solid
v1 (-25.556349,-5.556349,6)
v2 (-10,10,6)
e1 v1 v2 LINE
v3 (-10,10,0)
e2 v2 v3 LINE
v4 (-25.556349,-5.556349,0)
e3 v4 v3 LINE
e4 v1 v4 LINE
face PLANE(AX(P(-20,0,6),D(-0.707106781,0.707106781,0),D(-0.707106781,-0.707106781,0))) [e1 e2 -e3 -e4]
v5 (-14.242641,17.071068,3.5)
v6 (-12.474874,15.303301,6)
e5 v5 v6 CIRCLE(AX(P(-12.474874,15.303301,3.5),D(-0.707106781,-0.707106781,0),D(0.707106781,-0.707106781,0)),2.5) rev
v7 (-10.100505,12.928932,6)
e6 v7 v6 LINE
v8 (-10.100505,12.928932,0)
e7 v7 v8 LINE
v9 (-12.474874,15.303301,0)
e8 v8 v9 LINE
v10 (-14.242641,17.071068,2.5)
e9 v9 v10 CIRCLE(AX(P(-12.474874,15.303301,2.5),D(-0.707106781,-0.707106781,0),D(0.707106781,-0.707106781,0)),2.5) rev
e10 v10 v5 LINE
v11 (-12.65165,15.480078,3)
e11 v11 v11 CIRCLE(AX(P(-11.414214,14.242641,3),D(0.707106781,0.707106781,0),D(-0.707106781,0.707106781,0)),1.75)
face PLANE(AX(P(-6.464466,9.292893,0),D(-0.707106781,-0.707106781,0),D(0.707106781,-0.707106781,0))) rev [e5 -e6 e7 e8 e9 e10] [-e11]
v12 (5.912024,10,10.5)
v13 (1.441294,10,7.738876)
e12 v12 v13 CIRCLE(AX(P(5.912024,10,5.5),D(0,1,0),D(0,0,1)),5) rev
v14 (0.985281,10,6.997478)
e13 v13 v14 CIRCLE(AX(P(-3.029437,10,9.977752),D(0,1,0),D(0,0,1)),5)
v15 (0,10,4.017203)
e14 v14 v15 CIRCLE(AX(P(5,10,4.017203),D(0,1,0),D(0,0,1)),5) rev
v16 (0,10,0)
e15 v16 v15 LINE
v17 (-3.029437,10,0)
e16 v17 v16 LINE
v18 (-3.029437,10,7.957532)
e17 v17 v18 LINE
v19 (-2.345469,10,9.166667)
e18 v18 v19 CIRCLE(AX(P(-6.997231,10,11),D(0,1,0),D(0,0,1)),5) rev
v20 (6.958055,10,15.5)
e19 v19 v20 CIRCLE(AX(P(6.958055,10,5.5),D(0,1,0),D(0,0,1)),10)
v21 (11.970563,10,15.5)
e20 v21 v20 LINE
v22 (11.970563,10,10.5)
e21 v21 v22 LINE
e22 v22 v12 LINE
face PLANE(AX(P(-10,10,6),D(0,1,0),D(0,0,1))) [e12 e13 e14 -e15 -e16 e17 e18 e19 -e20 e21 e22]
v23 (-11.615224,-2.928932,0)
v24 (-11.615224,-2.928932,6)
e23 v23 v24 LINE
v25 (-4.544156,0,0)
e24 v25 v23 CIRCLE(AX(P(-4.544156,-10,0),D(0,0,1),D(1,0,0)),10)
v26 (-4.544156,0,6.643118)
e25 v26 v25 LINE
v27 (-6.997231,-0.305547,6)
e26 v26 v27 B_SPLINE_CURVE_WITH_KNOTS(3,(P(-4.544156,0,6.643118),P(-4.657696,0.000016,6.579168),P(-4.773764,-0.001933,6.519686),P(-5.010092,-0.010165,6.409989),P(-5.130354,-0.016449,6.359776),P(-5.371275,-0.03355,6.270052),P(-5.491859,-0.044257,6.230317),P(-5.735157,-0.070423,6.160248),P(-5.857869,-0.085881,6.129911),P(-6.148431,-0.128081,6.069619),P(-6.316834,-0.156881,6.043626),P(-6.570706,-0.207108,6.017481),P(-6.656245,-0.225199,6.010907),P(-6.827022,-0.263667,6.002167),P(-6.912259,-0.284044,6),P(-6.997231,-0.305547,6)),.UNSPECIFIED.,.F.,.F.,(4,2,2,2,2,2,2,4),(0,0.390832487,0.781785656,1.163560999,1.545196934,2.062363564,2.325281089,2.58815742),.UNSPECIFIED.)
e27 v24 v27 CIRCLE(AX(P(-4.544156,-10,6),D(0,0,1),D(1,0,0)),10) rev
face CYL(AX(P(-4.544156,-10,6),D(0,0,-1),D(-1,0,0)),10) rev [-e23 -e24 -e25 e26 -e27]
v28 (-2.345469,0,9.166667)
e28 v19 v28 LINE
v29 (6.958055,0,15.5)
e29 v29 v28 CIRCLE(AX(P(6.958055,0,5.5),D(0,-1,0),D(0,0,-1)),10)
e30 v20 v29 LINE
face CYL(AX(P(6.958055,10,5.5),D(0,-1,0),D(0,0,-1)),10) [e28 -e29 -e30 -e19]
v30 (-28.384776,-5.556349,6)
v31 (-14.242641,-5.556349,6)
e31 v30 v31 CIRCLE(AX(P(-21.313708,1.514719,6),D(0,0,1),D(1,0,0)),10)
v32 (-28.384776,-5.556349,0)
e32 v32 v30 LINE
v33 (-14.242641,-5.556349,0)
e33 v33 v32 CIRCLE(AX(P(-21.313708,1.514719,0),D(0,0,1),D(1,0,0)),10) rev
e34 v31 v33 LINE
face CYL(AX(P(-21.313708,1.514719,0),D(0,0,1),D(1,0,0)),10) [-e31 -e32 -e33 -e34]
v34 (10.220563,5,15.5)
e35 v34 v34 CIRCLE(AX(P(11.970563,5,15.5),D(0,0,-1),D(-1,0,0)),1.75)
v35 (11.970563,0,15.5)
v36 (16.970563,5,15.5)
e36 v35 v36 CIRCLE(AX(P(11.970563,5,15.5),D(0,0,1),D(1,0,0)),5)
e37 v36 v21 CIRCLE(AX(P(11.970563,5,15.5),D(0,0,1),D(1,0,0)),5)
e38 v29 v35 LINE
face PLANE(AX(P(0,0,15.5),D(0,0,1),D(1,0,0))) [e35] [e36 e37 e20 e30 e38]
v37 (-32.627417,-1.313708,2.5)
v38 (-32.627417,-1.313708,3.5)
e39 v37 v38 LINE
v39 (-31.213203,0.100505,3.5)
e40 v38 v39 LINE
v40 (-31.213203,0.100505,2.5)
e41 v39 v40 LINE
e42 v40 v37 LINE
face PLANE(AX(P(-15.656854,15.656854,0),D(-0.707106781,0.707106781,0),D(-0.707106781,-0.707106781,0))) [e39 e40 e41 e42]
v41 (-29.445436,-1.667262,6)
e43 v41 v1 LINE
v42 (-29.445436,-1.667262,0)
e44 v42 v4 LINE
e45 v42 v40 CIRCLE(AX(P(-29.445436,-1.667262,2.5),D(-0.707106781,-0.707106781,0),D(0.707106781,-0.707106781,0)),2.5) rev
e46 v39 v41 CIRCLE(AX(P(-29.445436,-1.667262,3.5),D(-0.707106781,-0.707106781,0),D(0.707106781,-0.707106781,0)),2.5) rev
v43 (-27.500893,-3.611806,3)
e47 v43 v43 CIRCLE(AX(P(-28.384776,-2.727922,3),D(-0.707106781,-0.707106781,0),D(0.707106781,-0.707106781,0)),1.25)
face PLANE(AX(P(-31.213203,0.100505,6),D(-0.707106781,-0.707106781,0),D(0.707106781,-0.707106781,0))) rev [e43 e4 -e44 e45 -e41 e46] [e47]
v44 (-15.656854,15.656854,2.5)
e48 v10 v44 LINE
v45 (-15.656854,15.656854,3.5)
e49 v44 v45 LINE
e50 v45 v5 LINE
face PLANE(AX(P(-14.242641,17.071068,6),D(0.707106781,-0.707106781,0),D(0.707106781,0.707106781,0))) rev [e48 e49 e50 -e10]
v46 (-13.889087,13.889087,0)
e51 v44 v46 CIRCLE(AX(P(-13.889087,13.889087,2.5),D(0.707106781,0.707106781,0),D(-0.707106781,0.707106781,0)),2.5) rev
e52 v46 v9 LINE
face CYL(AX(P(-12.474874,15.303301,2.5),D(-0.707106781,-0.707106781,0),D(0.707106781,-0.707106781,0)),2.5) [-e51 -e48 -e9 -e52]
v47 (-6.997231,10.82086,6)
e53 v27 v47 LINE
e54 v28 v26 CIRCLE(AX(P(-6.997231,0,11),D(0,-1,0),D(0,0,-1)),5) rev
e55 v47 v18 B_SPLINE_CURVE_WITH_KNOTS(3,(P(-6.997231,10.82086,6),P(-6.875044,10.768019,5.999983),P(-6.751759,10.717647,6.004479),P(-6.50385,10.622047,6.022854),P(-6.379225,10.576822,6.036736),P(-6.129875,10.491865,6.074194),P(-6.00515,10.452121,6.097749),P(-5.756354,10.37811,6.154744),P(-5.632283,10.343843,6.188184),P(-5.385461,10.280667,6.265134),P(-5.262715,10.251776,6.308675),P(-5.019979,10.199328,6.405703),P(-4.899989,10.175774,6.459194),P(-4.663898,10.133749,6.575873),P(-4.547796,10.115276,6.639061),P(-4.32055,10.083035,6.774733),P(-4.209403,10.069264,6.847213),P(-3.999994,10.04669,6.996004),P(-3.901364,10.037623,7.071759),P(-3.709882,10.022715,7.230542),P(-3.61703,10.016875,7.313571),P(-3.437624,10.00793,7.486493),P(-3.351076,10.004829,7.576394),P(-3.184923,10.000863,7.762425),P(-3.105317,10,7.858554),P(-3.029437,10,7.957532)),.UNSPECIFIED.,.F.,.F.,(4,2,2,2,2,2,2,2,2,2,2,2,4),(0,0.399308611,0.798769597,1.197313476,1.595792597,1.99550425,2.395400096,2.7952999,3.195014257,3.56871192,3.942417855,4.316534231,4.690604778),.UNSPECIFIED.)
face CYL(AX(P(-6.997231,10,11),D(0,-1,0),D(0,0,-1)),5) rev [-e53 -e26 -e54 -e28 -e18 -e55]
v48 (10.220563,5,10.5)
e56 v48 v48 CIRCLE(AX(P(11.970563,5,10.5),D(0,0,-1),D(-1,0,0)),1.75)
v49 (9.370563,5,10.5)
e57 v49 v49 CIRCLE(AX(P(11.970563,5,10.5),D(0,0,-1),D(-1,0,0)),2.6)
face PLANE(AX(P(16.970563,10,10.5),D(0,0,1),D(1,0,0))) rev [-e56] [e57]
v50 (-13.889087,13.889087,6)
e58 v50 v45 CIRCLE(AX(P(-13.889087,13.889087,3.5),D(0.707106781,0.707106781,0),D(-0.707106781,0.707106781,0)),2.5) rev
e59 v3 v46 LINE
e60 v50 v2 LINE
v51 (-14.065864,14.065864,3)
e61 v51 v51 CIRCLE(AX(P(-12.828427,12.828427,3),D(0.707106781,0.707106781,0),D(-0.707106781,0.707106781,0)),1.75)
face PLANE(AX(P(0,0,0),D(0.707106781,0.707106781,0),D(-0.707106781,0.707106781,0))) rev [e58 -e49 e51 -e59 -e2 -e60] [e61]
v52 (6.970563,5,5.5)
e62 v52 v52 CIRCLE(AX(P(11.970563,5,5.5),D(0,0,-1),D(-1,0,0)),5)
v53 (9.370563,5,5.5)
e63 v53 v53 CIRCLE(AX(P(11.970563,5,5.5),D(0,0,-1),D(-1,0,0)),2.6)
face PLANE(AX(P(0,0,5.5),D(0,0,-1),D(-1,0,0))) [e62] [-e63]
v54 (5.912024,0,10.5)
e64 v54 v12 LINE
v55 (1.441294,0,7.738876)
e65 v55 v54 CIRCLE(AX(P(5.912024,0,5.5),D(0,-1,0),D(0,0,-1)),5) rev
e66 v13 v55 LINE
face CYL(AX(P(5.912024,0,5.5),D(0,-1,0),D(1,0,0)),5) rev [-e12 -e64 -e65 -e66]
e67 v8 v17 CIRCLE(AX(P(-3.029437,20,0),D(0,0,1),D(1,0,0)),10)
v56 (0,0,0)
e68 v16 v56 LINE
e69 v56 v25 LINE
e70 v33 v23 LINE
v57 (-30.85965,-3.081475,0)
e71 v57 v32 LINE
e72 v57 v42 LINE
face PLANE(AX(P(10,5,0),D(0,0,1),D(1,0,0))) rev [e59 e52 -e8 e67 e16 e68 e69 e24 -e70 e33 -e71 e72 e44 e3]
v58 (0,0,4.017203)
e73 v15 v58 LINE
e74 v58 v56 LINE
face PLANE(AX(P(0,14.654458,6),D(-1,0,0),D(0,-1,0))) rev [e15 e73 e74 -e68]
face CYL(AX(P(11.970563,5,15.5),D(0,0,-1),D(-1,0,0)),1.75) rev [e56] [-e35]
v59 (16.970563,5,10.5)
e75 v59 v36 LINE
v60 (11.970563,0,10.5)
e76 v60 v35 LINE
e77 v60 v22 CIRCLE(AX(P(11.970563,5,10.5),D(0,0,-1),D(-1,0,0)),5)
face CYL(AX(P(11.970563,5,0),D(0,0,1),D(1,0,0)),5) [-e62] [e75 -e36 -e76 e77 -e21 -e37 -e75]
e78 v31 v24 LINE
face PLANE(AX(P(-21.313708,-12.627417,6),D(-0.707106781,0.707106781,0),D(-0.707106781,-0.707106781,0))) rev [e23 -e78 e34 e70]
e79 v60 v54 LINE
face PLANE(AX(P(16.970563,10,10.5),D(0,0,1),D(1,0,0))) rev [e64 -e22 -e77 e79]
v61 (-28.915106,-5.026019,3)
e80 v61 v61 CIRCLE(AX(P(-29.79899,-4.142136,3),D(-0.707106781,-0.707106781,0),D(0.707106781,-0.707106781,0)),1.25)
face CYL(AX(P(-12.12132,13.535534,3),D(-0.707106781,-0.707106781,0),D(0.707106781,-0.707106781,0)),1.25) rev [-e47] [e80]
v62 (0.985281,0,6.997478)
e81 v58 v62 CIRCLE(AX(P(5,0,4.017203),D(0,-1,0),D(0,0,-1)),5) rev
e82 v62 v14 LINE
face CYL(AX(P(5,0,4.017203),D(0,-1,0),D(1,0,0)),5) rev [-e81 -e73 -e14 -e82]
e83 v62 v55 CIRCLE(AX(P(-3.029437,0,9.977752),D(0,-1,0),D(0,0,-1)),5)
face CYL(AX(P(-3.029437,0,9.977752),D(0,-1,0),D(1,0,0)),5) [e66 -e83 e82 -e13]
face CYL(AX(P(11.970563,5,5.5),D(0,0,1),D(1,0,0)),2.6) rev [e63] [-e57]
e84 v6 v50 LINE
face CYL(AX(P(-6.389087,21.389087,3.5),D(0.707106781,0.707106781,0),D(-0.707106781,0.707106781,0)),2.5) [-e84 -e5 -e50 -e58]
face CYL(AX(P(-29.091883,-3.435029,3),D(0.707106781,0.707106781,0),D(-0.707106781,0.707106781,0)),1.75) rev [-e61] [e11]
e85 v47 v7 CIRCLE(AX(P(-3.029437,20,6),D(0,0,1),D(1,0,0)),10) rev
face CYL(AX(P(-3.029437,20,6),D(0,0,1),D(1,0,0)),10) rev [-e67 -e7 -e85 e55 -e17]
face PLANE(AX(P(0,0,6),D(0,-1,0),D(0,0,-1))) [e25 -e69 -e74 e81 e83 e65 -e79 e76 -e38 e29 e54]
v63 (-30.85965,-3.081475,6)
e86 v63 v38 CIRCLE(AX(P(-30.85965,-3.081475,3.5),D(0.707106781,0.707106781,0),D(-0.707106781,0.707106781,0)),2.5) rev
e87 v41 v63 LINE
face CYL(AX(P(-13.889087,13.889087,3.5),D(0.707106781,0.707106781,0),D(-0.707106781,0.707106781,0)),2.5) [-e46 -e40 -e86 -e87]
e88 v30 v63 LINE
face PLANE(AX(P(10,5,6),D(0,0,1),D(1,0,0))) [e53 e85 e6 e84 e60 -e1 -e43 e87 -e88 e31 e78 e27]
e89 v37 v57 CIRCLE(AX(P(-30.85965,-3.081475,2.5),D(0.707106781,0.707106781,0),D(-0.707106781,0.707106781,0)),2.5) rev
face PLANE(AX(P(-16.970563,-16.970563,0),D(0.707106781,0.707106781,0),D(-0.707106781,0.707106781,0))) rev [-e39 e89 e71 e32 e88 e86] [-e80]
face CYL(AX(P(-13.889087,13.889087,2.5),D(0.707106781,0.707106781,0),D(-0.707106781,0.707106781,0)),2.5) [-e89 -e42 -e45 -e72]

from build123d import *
from build123d.topology import SkipClean

# Parameters (mm, degrees)
ESTRUSIONE_ESTRUSIONE1_DEPTH  = 6
ESTRUSIONE_ESTRUSIONE3_START  = -11
SCHIZZO3_R                    = 5
SCHIZZO3_R_2                  = 2.65
ESTRUSIONE_ESTRUSIONE3_DEPTH  = 11
SCHIZZO5_R                    = 0.925
ESTRUSIONE_ESTRUSIONE4_DEPTH  = 20
SCHIZZO12_W                   = 8
SCHIZZO12_H                   = 6
ESTRUSIONE_ESTRUSIONE6_DEPTH  = 2
SCHIZZO13_W                   = 6
SCHIZZO13_H                   = 2
ESTRUSIONE_ESTRUSIONE7_DEPTH  = 3
RACCORDO2_R                   = 2.5
SCHIZZO14_R                   = 1.75
SCHIZZO14_R_2                 = 0.925
TAGLIO_ESTRUSIONE7_DEPTH      = 25
SCHIZZO15_W                   = 6
SCHIZZO15_H                   = 8
ESTRUSIONE_ESTRUSIONE8_DEPTH  = 24
SCHIZZO16_W                   = 6
SCHIZZO16_H                   = 2
ESTRUSIONE_ESTRUSIONE9_DEPTH  = 7.999994
SCHIZZO17_R                   = 1.25
TAGLIO_ESTRUSIONE8_DEPTH      = 25
RACCORDO3_R                   = 10
RACCORDO4_R                   = 10
RACCORDO5_R                   = 10
RACCORDO6_R                   = 2.5
SCHIZZO18_R                   = 1.75
TAGLIO_ESTRUSIONE9_DEPTH      = 39.431359843
SCHIZZO20_W                   = 20
SCHIZZO20_H                   = 19.30891557
TAGLIO_ESTRUSIONE10_DEPTH     = 39.431359843
SCHIZZO21_W                   = 5
SCHIZZO21_H                   = 10
ESTRUSIONE_ESTRUSIONE10_DEPTH = 9.5
SCHIZZO22_W                   = 5
SCHIZZO22_H                   = 10
ESTRUSIONE_ESTRUSIONE11_DEPTH = 15
RACCORDO7_R                   = 5
RACCORDO8_R                   = 10
RACCORDO9_R                   = 5
ESTRUSIONE_ESTRUSIONE13_START = 5
SCHIZZO24_R                   = 5
SCHIZZO24_R_2                 = 2.6
ESTRUSIONE_ESTRUSIONE13_DEPTH = 5
SCHIZZO26_R                   = 1.75
TAGLIO_ESTRUSIONE12_DEPTH     = 39.29124471
RACCORDO10_R                  = 5


with BuildPart() as part:
    # Schizzo1 → Estrusione-Estrusione1 (new body)
    with BuildSketch(Plane.XY):
        with BuildLine():
            Line((0, 0), (-20, 0))
            Line((-20, 0), (-10, 10))
            Line((-10, 10), (10, 10))
            ThreePointArc((10, 10), (15, 5), (10, 0))
            Line((10, 0), (0, 0))
        make_face()
    extrude(amount=ESTRUSIONE_ESTRUSIONE1_DEPTH)

    # Schizzo3 → Estrusione-Estrusione3 (add)
    with SkipClean():  # the faces are left unmerged after this step: merging them gives an invalid solid
        with BuildSketch(Plane.XY.offset(6).offset(ESTRUSIONE_ESTRUSIONE3_START)):
            with Locations(Location((10, 5, 0), (0, 0, 270))):
                Circle(SCHIZZO3_R)
            with Locations((10, 5)):
                Circle(SCHIZZO3_R_2, mode=Mode.SUBTRACT)
        extrude(amount=ESTRUSIONE_ESTRUSIONE3_DEPTH)



with BuildPart() as body_2:
    # Schizzo5 → Estrusione-Estrusione4 (new body)
    with BuildSketch(Plane(origin=(0, 0, 0), x_dir=(-0.7071067811865476, 0.7071067811865476, 0), z_dir=(0.7071067811865476, 0.7071067811865476, 0))):
        with Locations((18.142135624, 3)):
            Circle(SCHIZZO5_R)
    extrude(amount=-ESTRUSIONE_ESTRUSIONE4_DEPTH)

    # Schizzo12 → Estrusione-Estrusione6 (add)
    with BuildSketch(Plane(origin=(0, 0, 0), x_dir=(-0.7071067811865476, 0.7071067811865476, 0), z_dir=(0.7071067811865476, 0.7071067811865476, 0))):
        with Locations((18.142135624, 3)):
            Rectangle(SCHIZZO12_W, SCHIZZO12_H)
    extrude(amount=ESTRUSIONE_ESTRUSIONE6_DEPTH)


with BuildPart() as part_1:
    with SkipClean():  # the faces are left unmerged after this step: merging them gives an invalid solid
        add(part.part)

        add(body_2.part)  # Estrusione-Estrusione7 merges body 2
        # Schizzo13 → Estrusione-Estrusione7 (add)
        with BuildSketch(Plane(origin=(-10, 10, 0), x_dir=(0, 0, -1), z_dir=(0.7071067811865477, -0.7071067811865475, 0))):
            with Locations((-3, 1)):
                Rectangle(SCHIZZO13_W, SCHIZZO13_H)
        extrude(amount=ESTRUSIONE_ESTRUSIONE7_DEPTH)

    # Raccordo2
    raccordo2_edges = [part_1.edges().sort_by_distance(p)[0] for p in [
        (-14.949747468, 16.363961031, 0),
        (-14.949747468, 16.363961031, 6),
    ]]
    fillet(raccordo2_edges, radius=RACCORDO2_R)

    # Schizzo14 → Taglio-Estrusione7 (cut)
    # profile 1 of 2: a face of its own
    with SkipClean():  # the faces are left unmerged after this step: merging them gives an invalid solid
        with BuildSketch(Plane(origin=(1.414213562, 1.414213562, 0), x_dir=(0, 0, -1), z_dir=(0.7071067811865476, 0.7071067811865476, 0))):
            with Locations(Location((-3, 18.142135624, 0), (0, 0, 90))):
                Circle(SCHIZZO14_R)
            with Locations((-3, 18.142135624)):
                Circle(SCHIZZO14_R_2, mode=Mode.SUBTRACT)
        # profile 2 of 2: a face of its own
        with BuildSketch(Plane(origin=(1.414213562, 1.414213562, 0), x_dir=(0, 0, -1), z_dir=(0.7071067811865476, 0.7071067811865476, 0))):
            with Locations((-3, 18.142135624)):
                Circle(SCHIZZO14_R_2)
        extrude(amount=-TAGLIO_ESTRUSIONE7_DEPTH, mode=Mode.SUBTRACT)

    # Schizzo15 → Estrusione-Estrusione8 (add)
    with SkipClean():  # the faces are left unmerged after this step: merging them gives an invalid solid
        with BuildSketch(Plane(origin=(0, 0, 0), x_dir=(0, 0, 1), z_dir=(-0.7071067811865477, -0.7071067811865475, 0))):
            with Locations((3, 10.142135624)):
                Rectangle(SCHIZZO15_W, SCHIZZO15_H)
        extrude(amount=ESTRUSIONE_ESTRUSIONE8_DEPTH)

    # Schizzo16 → Estrusione-Estrusione9 (add)
    with SkipClean():  # the faces are left unmerged after this step: merging them gives an invalid solid
        with BuildSketch(Plane(origin=(-10, 10, 0), x_dir=(0, 0, 1), z_dir=(-0.7071067811865477, 0.7071067811865475, 0))):
            with Locations((3, -23)):
                Rectangle(SCHIZZO16_W, SCHIZZO16_H)
        extrude(amount=ESTRUSIONE_ESTRUSIONE9_DEPTH)

    # Schizzo17 → Taglio-Estrusione8 (cut)
    with SkipClean():  # the faces are left unmerged after this step: merging them gives an invalid solid
        with BuildSketch(Plane(origin=(-16.970562748, -16.970562748, 0), x_dir=(0, 0, 1), z_dir=(-0.7071067811865477, -0.7071067811865474, 0))):
            with Locations(Location((3, 18.142135624, 0), (0, 0, 270))):
                Circle(SCHIZZO17_R)
        extrude(amount=-TAGLIO_ESTRUSIONE8_DEPTH, mode=Mode.SUBTRACT)

    # Raccordo3
    # the kernel refuses this fillet: 10 mm, written as the material it takes off along each edge
    with BuildSketch(Plane(origin=(-21.313708499, -12.627416998, -25), x_dir=(0.7071067811865475, 0.7071067811865475, 0), z_dir=(0, 0, 1))) as raccordo3_piece_1:
        with BuildLine():
            CenterArc((RACCORDO3_R, RACCORDO3_R), RACCORDO3_R, 180, 90)
            Line((0, RACCORDO3_R), (0, 0))
            Line((0, 0), (RACCORDO3_R, 0))
        make_face()
    extrude(amount=56, mode=Mode.SUBTRACT)

    # Raccordo4
    raccordo4_edges = [part_1.edges().sort_by_distance(p)[0] for p in [
        (-8.686291501, 0, 3),
    ]]
    fillet(raccordo4_edges, radius=RACCORDO4_R)

    # Raccordo5
    raccordo5_edges = [part_1.edges().sort_by_distance(p)[0] for p in [
        (-7.171572875, 10, 3),
    ]]
    fillet(raccordo5_edges, radius=RACCORDO5_R)

    # Raccordo6
    raccordo6_edges = [part_1.edges().sort_by_distance(p)[0] for p in [
        (-31.920305974, -0.60660596, 6),
        (-31.920305974, -0.60660596, 0),
    ]]
    fillet(raccordo6_edges, radius=RACCORDO6_R)

    # Schizzo18 → Taglio-Estrusione9 (cut, through all)
    with BuildSketch(Plane.XY.offset(6)):
        with Locations((10, 5)):
            Circle(SCHIZZO18_R)
    extrude(amount=-TAGLIO_ESTRUSIONE9_DEPTH, mode=Mode.SUBTRACT)

    # Schizzo20 → Taglio-Estrusione10 (cut, through all)
    with BuildSketch(Plane(origin=(0, 0, -5), x_dir=(-1, 0, 0), z_dir=(0, 0, -1))):
        with Locations((-10, 5)):
            Rectangle(SCHIZZO20_W, SCHIZZO20_H)
    extrude(amount=-TAGLIO_ESTRUSIONE10_DEPTH, mode=Mode.SUBTRACT)

    # Schizzo21 → Estrusione-Estrusione10 (add)
    with BuildSketch(Plane.XY.offset(6)):
        with Locations((-0.529437252, 5)):
            Rectangle(SCHIZZO21_W, SCHIZZO21_H)
    extrude(amount=ESTRUSIONE_ESTRUSIONE10_DEPTH)

    # Schizzo22 → Estrusione-Estrusione11 (add)
    with BuildSketch(Plane(origin=(1.970562748, 0, 0), x_dir=(0, 0, -1), z_dir=(1, 0, 0))):
        with Locations((-13, 5)):
            Rectangle(SCHIZZO22_W, SCHIZZO22_H)
    extrude(amount=ESTRUSIONE_ESTRUSIONE11_DEPTH)

    # Raccordo7
    # the kernel refuses this fillet: 5 mm, written as the material it takes off along each edge
    with BuildSketch(Plane(origin=(1.970562748, 19.944379675, 6), x_dir=(-1, 0, 0), z_dir=(0, -1, 0))) as raccordo7_piece_1:
        with BuildLine():
            CenterArc((5, -3.97775187), RACCORDO7_R, 127.292729202, 52.707270798)
            Line((0, -3.97775187), (-0.1, -3.97775187))
            Line((-0.1, -3.97775187), (-0.1, 0))
            Line((-0.1, 0), (0, 0.1))
            ThreePointArc((0, 0.1), (0.985281374, 0.1), (1.909974003, 0.079555037))
            Line((1.909974003, 0.079555037), (1.970562748, 0))
        make_face()
    extrude(amount=29.88875935, mode=Mode.SUBTRACT)
    with BuildSketch(Plane(origin=(16.970562748, 0, -2), x_dir=(0, 1, 0), z_dir=(0, 0, 1))) as raccordo7_piece_2:
        with BuildLine():
            CenterArc((RACCORDO7_R, RACCORDO7_R), RACCORDO7_R, 180, 90)
            Line((0, RACCORDO7_R), (-RACCORDO7_R * 0.02, RACCORDO7_R))
            Line((-RACCORDO7_R * 0.02, RACCORDO7_R), (-RACCORDO7_R * 0.02, -RACCORDO7_R * 0.02))
            Line((-RACCORDO7_R * 0.02, -RACCORDO7_R * 0.02), (RACCORDO7_R, -RACCORDO7_R * 0.02))
            Line((RACCORDO7_R, -RACCORDO7_R * 0.02), (RACCORDO7_R, 0))
        make_face()
    extrude(amount=30, mode=Mode.SUBTRACT)
    with BuildSketch(Plane(origin=(16.970562748, 10, 28), x_dir=(-1, 0, 0), z_dir=(0, 0, -1))) as raccordo7_piece_3:
        with BuildLine():
            CenterArc((RACCORDO7_R, -RACCORDO7_R), RACCORDO7_R, 90, 90)
            Line((0, -RACCORDO7_R), (-RACCORDO7_R * 0.02, -RACCORDO7_R))
            Line((-RACCORDO7_R * 0.02, -RACCORDO7_R), (-RACCORDO7_R * 0.02, RACCORDO7_R * 0.02))
            Line((-RACCORDO7_R * 0.02, RACCORDO7_R * 0.02), (RACCORDO7_R, RACCORDO7_R * 0.02))
            Line((RACCORDO7_R, RACCORDO7_R * 0.02), (RACCORDO7_R, 0))
        make_face()
    extrude(amount=30, mode=Mode.SUBTRACT)

    # Raccordo8
    # the kernel refuses this fillet: 10 mm, written as the material it takes off along each edge
    with BuildSketch(Plane(origin=(-3.029437252, -24.968730444, 15.5), x_dir=(1, 0, 0), z_dir=(0, 1, 0))) as raccordo8_piece_1:
        with BuildLine():
            CenterArc((9.987492178, 10), RACCORDO8_R, 182.865983983, 87.134016017)
            Line((0, 9.5), (-0.199749844, 9.49))
            ThreePointArc((-0.199749844, 9.49), (-0.2, 4.75), (-0.2, 0))
            Line((-0.2, 0), (0, -0.2))
            Line((0, -0.2), (9.987492178, -0.2))
            Line((9.987492178, -0.2), (9.987492178, 0))
        make_face()
    extrude(amount=59.937460889, mode=Mode.SUBTRACT)

    # Raccordo9
    raccordo9_edges = [part_1.edges().sort_by_distance(p)[0] for p in [
        (-3.029437252, 5, 6),
    ]]
    fillet(raccordo9_edges, radius=RACCORDO9_R)

    # Schizzo24 → Estrusione-Estrusione13 (add)
    with BuildSketch(Plane(origin=(0, 0, 10.5), x_dir=(-1, 0, 0), z_dir=(0, 0, -1)).offset(ESTRUSIONE_ESTRUSIONE13_START)):
        with Locations(Location((-11.970562748, 5, 0), (0, 0, 180))):
            Circle(SCHIZZO24_R)
        with Locations((-11.970562748, 5)):
            Circle(SCHIZZO24_R_2, mode=Mode.SUBTRACT)
    extrude(amount=-ESTRUSIONE_ESTRUSIONE13_DEPTH)

    # Schizzo26 → Taglio-Estrusione12 (cut, through all)
    with BuildSketch(Plane(origin=(0, 0, 10.5), x_dir=(-1, 0, 0), z_dir=(0, 0, -1))):
        with Locations((-11.970562748, 5)):
            Circle(SCHIZZO26_R)
    extrude(amount=-TAGLIO_ESTRUSIONE12_DEPTH, mode=Mode.SUBTRACT)

    # Raccordo10
    raccordo10_edges = [part_1.edges().sort_by_distance(p)[0] for p in [
        (0, 5, 6),
        (1.970562748, 5, 10.5),
    ]]
    fillet(raccordo10_edges, radius=RACCORDO10_R)


solid = part_1.part
